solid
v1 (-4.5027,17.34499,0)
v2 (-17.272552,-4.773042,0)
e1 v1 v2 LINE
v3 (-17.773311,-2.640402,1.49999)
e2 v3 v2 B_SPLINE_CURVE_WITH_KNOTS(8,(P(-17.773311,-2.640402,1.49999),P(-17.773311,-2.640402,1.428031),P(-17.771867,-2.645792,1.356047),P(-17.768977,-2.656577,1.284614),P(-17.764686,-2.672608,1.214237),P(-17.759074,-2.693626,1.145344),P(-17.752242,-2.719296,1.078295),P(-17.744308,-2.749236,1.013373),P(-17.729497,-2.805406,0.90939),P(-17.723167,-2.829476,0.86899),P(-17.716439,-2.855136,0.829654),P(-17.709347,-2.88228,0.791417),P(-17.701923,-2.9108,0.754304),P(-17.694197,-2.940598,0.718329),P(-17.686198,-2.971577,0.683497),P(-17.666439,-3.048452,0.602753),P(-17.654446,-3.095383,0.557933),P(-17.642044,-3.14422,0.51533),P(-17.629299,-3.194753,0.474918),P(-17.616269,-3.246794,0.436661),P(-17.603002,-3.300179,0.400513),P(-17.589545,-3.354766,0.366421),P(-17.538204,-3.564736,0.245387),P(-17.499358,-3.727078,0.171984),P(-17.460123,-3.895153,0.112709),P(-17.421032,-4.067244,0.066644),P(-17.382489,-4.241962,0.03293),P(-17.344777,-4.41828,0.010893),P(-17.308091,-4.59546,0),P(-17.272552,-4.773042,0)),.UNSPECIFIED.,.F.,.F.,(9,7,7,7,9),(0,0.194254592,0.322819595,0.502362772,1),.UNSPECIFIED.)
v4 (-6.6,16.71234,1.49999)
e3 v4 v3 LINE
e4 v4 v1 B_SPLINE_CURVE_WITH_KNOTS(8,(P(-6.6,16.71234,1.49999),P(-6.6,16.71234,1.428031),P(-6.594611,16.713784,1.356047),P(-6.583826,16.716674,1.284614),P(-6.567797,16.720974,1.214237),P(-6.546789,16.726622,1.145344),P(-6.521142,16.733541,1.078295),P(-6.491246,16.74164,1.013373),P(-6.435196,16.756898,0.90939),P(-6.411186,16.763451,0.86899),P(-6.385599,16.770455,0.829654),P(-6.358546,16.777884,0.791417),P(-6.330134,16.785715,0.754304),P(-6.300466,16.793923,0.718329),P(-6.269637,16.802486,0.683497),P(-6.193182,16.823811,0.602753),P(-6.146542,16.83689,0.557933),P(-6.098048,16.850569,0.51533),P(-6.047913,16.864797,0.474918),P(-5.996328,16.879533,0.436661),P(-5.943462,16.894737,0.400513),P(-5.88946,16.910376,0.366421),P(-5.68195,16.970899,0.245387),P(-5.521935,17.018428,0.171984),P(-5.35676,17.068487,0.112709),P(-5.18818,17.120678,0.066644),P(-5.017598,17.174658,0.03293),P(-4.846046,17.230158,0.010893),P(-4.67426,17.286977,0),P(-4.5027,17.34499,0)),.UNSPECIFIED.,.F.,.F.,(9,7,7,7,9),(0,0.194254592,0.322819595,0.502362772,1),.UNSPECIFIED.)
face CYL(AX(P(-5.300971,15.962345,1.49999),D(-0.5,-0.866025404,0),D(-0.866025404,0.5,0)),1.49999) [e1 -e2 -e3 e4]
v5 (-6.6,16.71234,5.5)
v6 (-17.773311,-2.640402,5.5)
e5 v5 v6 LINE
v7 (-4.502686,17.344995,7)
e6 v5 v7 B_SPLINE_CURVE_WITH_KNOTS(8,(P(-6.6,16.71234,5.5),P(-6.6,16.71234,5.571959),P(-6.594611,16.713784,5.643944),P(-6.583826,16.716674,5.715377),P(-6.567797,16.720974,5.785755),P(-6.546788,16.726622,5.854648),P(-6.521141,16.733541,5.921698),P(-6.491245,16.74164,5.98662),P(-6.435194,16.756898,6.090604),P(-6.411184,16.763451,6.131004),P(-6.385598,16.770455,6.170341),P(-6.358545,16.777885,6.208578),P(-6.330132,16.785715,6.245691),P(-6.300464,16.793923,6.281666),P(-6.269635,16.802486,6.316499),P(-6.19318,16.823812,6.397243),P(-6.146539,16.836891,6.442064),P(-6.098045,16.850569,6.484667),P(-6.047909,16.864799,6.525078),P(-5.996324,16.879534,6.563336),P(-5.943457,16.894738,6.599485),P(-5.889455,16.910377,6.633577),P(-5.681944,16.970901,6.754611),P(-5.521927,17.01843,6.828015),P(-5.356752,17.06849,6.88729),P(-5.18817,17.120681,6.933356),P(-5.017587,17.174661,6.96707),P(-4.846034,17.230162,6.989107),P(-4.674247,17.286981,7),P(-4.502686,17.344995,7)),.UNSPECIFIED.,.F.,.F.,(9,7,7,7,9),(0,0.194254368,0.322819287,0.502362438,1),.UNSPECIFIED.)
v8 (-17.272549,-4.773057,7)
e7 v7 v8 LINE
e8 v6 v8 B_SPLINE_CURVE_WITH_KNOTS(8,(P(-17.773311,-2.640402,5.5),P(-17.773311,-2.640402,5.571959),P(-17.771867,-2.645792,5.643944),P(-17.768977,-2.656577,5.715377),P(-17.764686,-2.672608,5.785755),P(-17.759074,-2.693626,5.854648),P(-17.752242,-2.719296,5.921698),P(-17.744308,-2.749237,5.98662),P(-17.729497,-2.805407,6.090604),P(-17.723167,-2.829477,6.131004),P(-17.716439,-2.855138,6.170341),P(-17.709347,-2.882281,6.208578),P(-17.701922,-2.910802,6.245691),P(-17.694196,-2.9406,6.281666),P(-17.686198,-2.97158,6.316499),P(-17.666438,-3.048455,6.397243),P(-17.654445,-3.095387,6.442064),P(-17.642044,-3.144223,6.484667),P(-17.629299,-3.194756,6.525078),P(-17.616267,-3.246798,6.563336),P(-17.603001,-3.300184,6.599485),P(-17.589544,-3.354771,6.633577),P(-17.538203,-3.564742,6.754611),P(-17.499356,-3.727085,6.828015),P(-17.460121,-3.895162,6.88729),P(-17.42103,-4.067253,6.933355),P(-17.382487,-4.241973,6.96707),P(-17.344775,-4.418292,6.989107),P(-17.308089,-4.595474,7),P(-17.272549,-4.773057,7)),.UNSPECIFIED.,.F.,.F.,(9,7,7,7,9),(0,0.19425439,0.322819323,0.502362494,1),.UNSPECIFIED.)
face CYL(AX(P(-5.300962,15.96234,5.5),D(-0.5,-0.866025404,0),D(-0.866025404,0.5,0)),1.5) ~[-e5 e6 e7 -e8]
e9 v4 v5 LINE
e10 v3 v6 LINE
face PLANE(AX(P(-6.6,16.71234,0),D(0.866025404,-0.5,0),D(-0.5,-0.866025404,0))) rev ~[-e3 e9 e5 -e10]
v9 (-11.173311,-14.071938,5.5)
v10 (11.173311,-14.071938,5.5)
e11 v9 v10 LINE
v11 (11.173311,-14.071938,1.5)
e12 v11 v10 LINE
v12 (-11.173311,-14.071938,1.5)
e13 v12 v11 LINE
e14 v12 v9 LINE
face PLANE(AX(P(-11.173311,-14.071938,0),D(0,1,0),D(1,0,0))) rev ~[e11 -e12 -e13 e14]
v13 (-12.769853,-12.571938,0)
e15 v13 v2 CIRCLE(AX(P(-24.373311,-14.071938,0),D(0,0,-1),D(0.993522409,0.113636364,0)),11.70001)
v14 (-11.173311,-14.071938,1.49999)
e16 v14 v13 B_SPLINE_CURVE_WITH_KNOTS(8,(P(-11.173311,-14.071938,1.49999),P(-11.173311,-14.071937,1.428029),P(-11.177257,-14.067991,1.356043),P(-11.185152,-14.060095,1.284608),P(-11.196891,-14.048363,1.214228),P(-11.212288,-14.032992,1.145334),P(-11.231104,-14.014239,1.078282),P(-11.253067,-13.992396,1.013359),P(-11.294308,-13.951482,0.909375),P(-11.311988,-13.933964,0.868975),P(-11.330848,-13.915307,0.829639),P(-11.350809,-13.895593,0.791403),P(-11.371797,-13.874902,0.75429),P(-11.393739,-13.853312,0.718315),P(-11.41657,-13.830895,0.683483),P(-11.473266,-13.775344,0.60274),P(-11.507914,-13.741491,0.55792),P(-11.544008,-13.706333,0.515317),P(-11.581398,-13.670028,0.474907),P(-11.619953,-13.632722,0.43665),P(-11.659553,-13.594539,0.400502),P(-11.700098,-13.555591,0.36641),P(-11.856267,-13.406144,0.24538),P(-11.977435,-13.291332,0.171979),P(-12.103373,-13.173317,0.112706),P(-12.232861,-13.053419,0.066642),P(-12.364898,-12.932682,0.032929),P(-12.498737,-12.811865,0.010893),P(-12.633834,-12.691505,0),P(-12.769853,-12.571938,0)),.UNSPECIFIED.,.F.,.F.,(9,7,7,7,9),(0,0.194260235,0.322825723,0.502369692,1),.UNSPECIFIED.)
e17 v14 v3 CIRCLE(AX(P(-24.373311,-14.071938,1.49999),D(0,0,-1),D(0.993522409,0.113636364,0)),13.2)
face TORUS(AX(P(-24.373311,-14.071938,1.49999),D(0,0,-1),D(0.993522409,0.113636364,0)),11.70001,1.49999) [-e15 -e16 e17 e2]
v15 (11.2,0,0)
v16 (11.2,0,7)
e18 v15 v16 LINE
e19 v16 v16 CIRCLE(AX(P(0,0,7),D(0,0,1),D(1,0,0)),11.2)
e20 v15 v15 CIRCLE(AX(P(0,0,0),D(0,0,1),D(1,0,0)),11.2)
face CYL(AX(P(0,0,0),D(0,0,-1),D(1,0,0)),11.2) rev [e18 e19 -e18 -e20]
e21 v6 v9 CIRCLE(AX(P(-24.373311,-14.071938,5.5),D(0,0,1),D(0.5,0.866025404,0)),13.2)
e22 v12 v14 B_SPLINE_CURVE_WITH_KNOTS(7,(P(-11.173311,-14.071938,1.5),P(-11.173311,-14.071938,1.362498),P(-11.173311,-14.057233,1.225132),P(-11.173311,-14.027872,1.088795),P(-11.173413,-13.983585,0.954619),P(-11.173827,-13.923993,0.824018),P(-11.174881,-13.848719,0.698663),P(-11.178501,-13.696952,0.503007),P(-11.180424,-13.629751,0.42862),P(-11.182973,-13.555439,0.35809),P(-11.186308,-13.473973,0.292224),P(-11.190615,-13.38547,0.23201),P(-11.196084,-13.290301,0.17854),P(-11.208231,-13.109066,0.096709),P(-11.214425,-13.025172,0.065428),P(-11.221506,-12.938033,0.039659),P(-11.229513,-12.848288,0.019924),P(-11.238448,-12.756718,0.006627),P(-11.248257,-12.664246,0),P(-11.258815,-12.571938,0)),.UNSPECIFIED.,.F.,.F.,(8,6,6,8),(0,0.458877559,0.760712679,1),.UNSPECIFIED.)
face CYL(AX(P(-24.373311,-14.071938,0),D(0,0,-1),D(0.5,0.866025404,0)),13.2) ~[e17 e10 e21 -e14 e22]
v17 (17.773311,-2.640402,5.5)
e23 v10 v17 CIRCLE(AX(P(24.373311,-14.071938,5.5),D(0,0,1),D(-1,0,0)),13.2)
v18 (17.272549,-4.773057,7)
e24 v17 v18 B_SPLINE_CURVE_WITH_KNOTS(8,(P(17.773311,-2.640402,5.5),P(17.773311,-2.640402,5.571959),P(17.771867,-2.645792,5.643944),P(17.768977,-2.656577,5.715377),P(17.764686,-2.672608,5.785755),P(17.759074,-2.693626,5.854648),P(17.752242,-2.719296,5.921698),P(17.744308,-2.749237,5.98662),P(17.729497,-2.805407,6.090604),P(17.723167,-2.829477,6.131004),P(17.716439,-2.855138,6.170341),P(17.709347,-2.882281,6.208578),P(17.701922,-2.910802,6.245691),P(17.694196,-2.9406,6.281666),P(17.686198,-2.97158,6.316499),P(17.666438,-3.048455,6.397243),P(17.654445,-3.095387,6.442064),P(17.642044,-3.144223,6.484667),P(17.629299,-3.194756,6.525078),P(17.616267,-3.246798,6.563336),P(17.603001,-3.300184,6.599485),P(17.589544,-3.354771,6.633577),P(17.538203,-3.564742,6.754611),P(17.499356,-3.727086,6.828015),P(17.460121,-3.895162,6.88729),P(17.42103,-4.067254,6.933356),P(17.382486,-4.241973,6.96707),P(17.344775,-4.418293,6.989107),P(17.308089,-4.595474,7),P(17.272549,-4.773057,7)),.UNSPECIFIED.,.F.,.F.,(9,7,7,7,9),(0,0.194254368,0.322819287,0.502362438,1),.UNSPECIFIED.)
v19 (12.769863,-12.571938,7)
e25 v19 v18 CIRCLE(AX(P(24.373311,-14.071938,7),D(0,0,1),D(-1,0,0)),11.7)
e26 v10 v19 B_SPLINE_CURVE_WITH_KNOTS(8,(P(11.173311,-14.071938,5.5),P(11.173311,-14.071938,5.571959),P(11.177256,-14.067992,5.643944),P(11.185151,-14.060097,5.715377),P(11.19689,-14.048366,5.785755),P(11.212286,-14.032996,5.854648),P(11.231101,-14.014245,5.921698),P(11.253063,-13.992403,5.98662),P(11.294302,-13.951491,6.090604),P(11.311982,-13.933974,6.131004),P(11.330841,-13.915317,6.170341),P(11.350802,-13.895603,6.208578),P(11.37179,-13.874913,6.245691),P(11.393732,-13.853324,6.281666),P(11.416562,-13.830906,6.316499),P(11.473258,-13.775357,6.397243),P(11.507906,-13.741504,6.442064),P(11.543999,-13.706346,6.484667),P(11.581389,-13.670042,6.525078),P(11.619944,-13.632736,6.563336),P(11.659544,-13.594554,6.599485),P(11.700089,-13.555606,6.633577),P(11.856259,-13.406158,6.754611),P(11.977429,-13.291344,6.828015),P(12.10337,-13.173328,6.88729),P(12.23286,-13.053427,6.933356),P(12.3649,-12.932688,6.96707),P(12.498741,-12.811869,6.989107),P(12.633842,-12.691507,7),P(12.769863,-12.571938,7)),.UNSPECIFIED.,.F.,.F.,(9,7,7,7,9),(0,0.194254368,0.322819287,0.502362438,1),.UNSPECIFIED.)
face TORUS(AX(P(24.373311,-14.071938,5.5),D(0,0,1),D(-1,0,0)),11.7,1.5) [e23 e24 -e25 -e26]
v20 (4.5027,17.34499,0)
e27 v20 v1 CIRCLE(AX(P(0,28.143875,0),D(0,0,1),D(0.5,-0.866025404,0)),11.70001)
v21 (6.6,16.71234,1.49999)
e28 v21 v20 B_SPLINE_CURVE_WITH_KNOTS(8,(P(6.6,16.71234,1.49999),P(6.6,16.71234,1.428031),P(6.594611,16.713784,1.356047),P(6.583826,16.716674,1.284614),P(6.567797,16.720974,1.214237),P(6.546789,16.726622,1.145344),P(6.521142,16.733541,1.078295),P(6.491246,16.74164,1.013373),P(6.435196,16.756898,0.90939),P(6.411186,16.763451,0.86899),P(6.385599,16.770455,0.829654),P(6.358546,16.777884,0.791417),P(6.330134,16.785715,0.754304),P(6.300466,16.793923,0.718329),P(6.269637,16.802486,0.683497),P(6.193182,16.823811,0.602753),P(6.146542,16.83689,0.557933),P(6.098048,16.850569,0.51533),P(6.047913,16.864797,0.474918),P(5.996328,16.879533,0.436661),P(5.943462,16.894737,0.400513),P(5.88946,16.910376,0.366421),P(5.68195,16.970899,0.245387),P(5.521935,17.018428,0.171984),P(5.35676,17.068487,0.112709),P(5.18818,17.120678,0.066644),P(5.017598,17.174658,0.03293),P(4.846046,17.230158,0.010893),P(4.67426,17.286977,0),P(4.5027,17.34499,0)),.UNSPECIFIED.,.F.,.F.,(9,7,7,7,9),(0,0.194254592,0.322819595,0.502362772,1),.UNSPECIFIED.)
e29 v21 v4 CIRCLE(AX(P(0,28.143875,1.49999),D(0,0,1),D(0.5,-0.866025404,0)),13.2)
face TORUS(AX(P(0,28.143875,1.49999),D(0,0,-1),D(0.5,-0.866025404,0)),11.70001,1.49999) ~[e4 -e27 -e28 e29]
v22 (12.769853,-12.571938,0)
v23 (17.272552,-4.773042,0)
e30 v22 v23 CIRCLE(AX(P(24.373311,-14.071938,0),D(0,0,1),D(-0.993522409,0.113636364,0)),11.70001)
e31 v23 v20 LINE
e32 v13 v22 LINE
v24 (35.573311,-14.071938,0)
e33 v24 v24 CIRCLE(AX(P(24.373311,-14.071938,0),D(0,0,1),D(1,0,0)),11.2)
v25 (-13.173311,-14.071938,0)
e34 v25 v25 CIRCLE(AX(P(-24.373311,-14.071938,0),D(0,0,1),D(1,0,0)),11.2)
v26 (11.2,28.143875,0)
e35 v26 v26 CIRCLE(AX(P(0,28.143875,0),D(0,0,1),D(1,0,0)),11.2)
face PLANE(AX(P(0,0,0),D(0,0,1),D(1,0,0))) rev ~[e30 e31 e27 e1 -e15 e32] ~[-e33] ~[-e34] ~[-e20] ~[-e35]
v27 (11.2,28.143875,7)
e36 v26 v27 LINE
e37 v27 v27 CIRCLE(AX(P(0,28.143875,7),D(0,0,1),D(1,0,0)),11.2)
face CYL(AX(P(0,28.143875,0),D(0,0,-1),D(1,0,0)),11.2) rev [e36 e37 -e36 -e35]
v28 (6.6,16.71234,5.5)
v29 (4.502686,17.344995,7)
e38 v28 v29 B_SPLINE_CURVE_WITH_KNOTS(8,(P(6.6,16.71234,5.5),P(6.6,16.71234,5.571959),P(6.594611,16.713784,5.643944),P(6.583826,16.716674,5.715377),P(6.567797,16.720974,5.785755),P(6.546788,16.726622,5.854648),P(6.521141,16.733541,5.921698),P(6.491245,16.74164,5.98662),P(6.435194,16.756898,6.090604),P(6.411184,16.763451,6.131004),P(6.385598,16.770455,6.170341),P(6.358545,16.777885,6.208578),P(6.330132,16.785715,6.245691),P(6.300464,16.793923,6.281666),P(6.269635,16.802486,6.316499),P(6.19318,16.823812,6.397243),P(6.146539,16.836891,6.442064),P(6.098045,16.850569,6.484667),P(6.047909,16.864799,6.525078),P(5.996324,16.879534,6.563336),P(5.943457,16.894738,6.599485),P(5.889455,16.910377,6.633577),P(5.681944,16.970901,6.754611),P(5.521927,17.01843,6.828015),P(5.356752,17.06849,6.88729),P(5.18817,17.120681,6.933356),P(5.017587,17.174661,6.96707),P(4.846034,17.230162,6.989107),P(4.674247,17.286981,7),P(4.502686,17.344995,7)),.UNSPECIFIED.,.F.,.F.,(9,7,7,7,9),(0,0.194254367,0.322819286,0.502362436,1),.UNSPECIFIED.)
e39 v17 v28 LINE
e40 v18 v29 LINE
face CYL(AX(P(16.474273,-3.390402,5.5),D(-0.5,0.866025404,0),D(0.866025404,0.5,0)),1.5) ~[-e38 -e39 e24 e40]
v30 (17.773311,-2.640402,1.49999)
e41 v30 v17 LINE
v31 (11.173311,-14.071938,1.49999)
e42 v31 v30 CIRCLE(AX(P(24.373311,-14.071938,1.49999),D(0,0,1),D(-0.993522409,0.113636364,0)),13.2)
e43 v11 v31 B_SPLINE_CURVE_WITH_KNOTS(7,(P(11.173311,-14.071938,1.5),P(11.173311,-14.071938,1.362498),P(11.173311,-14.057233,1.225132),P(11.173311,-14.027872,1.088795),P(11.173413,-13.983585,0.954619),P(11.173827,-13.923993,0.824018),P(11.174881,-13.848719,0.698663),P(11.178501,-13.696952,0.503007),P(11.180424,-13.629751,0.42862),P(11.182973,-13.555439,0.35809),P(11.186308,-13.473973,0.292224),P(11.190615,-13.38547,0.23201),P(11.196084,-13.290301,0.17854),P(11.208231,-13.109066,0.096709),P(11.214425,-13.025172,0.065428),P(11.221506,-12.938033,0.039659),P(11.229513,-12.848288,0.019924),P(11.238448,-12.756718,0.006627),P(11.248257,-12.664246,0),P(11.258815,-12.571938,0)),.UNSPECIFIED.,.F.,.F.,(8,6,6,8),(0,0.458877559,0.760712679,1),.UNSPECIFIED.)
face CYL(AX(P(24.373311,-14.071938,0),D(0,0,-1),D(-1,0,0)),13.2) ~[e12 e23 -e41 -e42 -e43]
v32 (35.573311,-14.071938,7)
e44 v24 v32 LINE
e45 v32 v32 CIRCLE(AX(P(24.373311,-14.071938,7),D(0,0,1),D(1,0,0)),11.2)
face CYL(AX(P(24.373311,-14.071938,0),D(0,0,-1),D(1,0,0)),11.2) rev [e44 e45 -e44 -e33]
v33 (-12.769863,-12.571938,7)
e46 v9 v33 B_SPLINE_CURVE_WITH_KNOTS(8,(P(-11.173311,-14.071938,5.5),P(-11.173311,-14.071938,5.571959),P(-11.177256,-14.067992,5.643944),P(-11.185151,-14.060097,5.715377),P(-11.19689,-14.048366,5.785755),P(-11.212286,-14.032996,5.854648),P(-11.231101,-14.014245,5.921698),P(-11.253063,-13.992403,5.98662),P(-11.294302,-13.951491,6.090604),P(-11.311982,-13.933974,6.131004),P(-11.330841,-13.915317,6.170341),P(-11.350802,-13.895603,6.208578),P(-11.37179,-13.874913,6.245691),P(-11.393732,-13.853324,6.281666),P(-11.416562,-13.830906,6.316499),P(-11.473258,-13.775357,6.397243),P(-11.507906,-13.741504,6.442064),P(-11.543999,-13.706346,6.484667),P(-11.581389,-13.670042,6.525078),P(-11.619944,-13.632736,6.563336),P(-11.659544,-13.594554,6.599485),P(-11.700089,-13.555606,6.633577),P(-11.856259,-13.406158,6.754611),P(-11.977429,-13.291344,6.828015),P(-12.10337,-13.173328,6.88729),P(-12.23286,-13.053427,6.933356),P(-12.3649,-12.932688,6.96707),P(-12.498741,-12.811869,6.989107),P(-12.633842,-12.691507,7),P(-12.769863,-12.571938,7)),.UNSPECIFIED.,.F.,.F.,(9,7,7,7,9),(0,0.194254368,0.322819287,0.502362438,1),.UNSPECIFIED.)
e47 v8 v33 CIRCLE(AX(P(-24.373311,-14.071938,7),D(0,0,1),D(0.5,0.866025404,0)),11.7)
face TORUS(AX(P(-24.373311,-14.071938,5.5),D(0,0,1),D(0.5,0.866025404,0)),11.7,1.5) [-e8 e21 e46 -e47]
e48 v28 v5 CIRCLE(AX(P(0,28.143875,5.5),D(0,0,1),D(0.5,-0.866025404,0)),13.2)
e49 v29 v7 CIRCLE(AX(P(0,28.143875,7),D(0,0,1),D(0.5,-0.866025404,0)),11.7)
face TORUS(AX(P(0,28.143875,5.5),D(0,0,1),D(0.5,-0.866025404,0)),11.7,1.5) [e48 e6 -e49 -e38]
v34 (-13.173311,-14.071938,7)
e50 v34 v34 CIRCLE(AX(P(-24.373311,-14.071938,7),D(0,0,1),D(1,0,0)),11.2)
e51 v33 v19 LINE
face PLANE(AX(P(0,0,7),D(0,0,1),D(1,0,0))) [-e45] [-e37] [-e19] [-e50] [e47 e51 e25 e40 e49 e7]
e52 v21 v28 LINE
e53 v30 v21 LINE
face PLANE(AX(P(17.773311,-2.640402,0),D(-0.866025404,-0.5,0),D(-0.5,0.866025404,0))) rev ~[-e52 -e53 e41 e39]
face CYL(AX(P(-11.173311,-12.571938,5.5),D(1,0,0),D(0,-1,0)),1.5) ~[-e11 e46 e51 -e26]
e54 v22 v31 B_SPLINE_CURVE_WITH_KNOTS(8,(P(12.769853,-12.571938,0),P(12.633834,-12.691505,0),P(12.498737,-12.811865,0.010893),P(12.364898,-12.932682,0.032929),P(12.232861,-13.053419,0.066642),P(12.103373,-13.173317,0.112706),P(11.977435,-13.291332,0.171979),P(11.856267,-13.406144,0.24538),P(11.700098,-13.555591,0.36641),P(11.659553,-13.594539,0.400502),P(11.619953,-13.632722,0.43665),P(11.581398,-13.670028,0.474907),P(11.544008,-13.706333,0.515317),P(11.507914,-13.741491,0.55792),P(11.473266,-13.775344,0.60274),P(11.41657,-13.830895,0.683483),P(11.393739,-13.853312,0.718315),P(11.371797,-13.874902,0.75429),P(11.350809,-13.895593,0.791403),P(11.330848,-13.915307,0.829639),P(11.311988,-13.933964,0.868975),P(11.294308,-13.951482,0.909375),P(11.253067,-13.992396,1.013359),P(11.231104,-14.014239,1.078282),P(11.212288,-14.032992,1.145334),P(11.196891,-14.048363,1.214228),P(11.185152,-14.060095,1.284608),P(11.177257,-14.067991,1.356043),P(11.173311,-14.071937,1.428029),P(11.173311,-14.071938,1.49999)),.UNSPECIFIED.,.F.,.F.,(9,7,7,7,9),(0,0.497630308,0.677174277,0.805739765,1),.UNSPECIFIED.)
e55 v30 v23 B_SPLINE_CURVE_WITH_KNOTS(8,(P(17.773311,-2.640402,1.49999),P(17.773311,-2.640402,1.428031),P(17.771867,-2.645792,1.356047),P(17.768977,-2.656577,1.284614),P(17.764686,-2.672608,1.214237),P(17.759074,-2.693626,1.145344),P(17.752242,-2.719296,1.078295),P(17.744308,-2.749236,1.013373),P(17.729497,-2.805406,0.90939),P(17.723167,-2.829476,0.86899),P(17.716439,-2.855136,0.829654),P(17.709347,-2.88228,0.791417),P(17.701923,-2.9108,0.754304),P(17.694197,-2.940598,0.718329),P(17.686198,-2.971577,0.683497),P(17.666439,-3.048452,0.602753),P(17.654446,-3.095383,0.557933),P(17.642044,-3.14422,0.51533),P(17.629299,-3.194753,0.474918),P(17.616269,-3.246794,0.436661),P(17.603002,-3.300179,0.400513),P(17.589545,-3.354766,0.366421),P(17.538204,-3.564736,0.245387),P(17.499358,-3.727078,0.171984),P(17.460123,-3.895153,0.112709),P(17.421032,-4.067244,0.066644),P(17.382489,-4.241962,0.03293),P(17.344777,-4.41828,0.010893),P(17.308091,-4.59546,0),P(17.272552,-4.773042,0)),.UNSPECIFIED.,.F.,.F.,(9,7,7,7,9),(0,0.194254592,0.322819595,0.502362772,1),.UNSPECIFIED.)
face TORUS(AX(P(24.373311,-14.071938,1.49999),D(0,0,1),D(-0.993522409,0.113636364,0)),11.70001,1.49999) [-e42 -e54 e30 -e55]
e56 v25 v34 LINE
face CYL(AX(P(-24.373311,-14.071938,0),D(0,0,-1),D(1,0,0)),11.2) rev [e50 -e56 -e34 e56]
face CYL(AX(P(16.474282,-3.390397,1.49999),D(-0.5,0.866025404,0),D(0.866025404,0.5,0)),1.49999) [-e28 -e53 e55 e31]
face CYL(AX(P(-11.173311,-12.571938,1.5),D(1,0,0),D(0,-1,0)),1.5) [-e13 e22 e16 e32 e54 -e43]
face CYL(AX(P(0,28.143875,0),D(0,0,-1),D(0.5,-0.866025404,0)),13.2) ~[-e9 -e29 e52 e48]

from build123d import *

# Parameters (mm, degrees)
F0_R     = 11.2
F1_DEPTH = 7
F2_R     = 1.5
F3_R     = 1.49999


# Not quite as in the source:
# - a fillet or chamfer is up to 0.001 mm smaller than in the source, because OpenCascade refuses the exact size


with BuildPart() as f1:
    # F0 (on Top) → F1 (new body)
    with BuildSketch(Plane.XY):
        with BuildLine():
            Line((17.7733109715, -2.6404023205), (6.6, 16.7123399709))
            ThreePointArc((6.6, 16.7123399709), (0, 41.3438753009), (-6.6, 16.7123399709))
            Line((-6.6, 16.7123399709), (-17.7733109715, -2.6404023205))
            ThreePointArc((-17.7733109715, -2.6404023205), (-35.8048463015, -20.6719376504), (-11.1733109715, -14.0719376504))
            Line((-11.1733109715, -14.0719376504), (11.1733109715, -14.0719376504))
            ThreePointArc((11.1733109715, -14.0719376504), (35.8048463015, -20.6719376504), (17.7733109715, -2.6404023205))
        make_face()
        with Locations((-24.3733109715, -14.0719376504)):
            Circle(F0_R, mode=Mode.SUBTRACT)
        with Locations((24.3733109715, -14.0719376504)):
            Circle(F0_R, mode=Mode.SUBTRACT)
        Circle(F0_R, mode=Mode.SUBTRACT)
        with Locations((0, 28.1438753009)):
            Circle(F0_R, mode=Mode.SUBTRACT)
    extrude(amount=F1_DEPTH)

    # F2
    f2_edges = [f1.edges().sort_by_distance(p)[0] for p in [
        (0, -14.071938, 7),
        (0, -14.071938, 0),
        (-35.804846, -20.671938, 7),
        (-12.186655, 7.035969, 7),
        (0, 41.343875, 7),
        (12.186655, 7.035969, 7),
        (35.804846, -20.671938, 7),
    ]]
    fillet(f2_edges, radius=F2_R)

    # F3 (radius 1.5 in the source; OpenCascade refuses exactly that, so slightly less here)
    f3_edges = [f1.edges().sort_by_distance(p)[0] for p in [
        (-35.804846, -20.671938, 0),
        (-12.186655, 7.035969, 0),
        (0, 41.343875, 0),
        (12.186655, 7.035969, 0),
        (35.804846, -20.671938, 0),
    ]]
    fillet(f3_edges, radius=F3_R)


solid = f1.part
